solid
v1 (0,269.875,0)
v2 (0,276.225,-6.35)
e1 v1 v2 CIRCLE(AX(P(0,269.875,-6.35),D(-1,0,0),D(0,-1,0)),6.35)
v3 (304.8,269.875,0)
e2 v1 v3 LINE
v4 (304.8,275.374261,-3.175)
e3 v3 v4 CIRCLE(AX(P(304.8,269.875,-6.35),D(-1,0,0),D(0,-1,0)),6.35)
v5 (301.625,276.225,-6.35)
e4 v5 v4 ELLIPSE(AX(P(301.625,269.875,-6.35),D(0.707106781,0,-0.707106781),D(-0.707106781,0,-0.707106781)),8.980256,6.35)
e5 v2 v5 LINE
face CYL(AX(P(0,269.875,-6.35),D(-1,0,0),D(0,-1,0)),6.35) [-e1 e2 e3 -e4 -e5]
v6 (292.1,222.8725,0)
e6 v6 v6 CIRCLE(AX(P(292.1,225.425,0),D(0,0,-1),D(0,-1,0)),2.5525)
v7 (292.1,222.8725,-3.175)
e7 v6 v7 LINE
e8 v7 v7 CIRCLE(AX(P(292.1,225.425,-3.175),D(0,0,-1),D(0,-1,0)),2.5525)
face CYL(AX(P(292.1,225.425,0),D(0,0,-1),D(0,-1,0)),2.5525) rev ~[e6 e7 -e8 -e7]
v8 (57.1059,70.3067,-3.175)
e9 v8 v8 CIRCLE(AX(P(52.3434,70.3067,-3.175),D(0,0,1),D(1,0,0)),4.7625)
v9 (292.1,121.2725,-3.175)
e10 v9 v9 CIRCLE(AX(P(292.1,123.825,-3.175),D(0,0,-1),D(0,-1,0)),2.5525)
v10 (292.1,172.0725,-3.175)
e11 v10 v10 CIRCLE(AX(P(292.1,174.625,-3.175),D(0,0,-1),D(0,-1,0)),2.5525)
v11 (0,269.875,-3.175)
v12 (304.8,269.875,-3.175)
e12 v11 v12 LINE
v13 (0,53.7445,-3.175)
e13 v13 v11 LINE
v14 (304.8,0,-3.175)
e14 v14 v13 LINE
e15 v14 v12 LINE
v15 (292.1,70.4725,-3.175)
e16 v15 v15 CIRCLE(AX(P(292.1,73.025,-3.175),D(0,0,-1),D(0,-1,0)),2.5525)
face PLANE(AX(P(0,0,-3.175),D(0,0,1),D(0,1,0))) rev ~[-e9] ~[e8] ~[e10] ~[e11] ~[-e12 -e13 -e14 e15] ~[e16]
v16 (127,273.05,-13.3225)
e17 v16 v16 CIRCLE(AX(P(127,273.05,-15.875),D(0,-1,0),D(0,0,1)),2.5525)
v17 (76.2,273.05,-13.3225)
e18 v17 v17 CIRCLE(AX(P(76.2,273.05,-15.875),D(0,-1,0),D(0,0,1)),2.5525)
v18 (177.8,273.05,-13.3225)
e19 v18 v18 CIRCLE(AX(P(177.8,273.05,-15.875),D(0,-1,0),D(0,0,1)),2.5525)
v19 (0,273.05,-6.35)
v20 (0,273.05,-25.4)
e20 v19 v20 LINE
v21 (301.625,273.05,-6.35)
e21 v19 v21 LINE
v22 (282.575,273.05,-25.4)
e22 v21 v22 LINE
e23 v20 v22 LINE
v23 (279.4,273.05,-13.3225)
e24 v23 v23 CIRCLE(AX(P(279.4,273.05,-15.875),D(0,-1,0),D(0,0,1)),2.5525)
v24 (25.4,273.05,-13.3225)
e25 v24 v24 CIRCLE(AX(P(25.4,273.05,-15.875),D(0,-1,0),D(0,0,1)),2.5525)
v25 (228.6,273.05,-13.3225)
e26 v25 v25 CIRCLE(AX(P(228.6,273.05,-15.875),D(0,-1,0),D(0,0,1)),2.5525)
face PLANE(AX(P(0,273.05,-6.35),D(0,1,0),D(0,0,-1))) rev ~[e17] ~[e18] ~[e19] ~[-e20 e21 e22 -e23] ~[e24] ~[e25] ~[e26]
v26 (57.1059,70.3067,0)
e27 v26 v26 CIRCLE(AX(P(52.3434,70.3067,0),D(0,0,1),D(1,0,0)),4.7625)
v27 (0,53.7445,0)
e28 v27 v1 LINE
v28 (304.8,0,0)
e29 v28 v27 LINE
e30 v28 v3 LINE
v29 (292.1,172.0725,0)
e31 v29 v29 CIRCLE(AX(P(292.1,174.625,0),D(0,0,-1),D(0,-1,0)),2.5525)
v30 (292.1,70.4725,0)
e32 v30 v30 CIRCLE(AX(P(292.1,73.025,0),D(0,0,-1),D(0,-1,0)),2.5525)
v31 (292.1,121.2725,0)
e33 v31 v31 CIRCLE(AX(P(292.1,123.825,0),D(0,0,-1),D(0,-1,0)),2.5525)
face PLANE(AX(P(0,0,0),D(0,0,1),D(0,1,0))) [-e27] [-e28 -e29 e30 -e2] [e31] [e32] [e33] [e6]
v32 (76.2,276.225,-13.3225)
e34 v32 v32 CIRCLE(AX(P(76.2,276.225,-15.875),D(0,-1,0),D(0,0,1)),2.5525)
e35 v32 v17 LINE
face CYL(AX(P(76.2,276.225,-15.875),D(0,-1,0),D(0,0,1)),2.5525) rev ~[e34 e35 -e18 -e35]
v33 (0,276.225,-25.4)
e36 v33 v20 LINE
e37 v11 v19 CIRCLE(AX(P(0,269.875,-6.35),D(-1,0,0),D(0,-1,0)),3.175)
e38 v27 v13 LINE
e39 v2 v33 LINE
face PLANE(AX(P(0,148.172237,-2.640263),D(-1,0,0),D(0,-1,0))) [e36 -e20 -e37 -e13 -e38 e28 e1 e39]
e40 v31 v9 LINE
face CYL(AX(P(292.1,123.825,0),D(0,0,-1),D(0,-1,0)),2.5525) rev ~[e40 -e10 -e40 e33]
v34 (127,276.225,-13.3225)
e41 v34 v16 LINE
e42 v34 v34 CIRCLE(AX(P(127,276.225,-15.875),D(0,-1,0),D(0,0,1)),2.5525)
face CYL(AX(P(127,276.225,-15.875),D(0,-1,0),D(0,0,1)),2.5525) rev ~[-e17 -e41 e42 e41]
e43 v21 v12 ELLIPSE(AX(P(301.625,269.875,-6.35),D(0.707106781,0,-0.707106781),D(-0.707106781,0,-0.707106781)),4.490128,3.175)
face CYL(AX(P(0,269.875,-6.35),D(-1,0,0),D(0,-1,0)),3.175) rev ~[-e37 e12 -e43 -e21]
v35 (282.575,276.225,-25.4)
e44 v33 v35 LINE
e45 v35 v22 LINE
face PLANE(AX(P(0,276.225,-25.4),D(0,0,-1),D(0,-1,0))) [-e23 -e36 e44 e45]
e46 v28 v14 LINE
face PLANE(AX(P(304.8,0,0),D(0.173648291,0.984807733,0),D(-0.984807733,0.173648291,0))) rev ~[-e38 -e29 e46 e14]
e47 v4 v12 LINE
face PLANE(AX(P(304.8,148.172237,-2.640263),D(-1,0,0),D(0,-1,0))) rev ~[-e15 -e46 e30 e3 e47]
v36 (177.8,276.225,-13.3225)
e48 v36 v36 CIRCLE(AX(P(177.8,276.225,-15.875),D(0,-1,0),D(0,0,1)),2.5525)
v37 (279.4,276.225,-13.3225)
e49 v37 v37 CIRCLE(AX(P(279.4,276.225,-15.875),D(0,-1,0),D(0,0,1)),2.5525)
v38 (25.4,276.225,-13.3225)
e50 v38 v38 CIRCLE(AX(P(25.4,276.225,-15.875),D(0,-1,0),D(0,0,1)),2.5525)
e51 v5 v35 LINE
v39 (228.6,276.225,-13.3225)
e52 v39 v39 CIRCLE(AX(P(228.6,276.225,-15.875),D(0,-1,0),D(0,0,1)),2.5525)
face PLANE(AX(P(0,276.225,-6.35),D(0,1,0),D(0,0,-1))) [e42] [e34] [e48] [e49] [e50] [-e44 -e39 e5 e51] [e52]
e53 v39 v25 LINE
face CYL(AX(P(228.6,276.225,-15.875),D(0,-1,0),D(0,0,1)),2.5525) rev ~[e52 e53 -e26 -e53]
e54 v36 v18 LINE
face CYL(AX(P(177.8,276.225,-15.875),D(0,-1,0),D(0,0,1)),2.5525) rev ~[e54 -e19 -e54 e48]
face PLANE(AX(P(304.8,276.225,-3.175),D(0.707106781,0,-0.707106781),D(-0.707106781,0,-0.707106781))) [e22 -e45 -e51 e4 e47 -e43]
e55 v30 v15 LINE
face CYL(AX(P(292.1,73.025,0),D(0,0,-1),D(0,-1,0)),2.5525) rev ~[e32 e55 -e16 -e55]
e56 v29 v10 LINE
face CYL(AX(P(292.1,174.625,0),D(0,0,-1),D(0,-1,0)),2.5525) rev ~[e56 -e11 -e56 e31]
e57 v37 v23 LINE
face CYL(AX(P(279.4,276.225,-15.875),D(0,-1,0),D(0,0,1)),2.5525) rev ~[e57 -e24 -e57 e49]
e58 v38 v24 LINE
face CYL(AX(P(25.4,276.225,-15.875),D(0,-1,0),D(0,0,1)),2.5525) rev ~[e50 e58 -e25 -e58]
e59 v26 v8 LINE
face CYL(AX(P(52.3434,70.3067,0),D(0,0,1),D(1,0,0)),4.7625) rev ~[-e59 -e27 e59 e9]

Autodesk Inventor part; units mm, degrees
ref_plane "YZ Plane" through (0, 0, 0) normal (1, 0, 0) x (0, 1, 0)
ref_plane "XZ Plane" through (0, 0, 0) normal (0, 1, 0) x (-1, 0, 0)
ref_plane "XY Plane" through (0, 0, 0) normal (0, 0, 1) x (1, 0, 0)
sketch "Sketch1" plane through (0, 0, 0) normal (1, 0, 0) x (0, 1, 0)
  line L0 (0, 0) -> (276.225, 0)
  line L1 (276.225, 0) -> (276.225, -25.4)
  dimension "d0" = 25.4
  dimension "d1" = 276.225
contour flange "Contour Flange1" sketch "Sketch1" thickness 3.175 bend radius 3.175 width 304.8 along (1, 0, 0) mid plane no both sides no wall seen from (0, 138.1125, 0) lies toward (0, 0, -1) curves L0 L1
bend "Bend1"
corner "Corner1"
sketch "Sketch2" plane through (0, 0, 0) normal (0, 0, 1) x (1, 0, 0)
  line L0 (304.8, 0) -> (304.8, 269.875) projected
  line L1 (304.8, 0) -> (0, 53.7445)
  line L2 (0, 0) -> (0, 269.875) projected
  line L3 (0, 269.875) -> (304.8, 269.875) projected
  line L4 (0, 0) -> (0, 269.875) projected
  line L5 (304.8, 0) -> (0, 0) projected
  line L6 (304.8, 269.875) -> (304.8, 0) projected
  dimension "d13" = 10
extrude "Cut1" cut sketch "Sketch2" against normal blind 3.175 contours L5 L2 L1
sketch "Sketch3" plane through (0, 276.225, -25.4) normal (0, 1, 0) x (1, 0, 0)
  line L0 (304.8, -22.225) -> (282.575, 0)
  line L1 (0, 0) -> (304.8, 0) projected
  line L2 (304.8, 0) -> (304.8, -19.05) projected
  line L3 (304.8, 0) -> (304.8, -22.225)
  point P0 (0, -25.4)
  dimension "d16" = 45
extrude "Cut2" cut sketch "Sketch3" against normal through all
sketch "Sketch4" plane through (0, 269.875, 0) normal (0, 0, 1) x (1, 0, 0)
  line L0 (304.8, 0) -> (304.8, -269.875) projected
  point P0 (0, -269.875)
  point P1 (292.1, -196.85)
  point P2 (292.1, -146.05)
  point P3 (292.1, -95.25)
  point P4 (292.1, -44.45)
  dimension "d19" = 73.025
  dimension "d20" = 12.7
  dimension "d23" = 50.8
hole "Hole1" at (292.1, 73.025, 0) at (292.1, 123.825, 0) at (292.1, 174.625, 0) at (292.1, 225.425, 0) direction (0, 0, -1) diameter 5.105 end through all clearance for "Flat Head Machine Screw (82)" size "#10" standard "Ansi Unified Screw Threads"
sketch "Sketch5" plane through (0, 276.225, -6.35) normal (0, 1, 0) x (1, 0, 0)
  line L0 (0, 19.05) -> (282.575, 19.05) projected
  line L1 (0, 0) -> (0, 19.05) projected
  point P0 (0, -6.35)
  point P1 (25.4, 9.525)
  point P2 (76.2, 9.525)
  point P3 (127, 9.525)
  point P4 (177.8, 9.525)
  point P5 (228.6, 9.525)
  point P6 (279.4, 9.525)
  dimension "d35" = 9.525
  dimension "d36" = 25.4
  dimension "d39" = 50.8
hole "Hole2" at (25.4, 276.225, -15.875) at (76.2, 276.225, -15.875) at (127, 276.225, -15.875) at (177.8, 276.225, -15.875) at (228.6, 276.225, -15.875) at (279.4, 276.225, -15.875) direction (0, -1, 0) diameter 5.105 end through all clearance for "Flat Head Machine Screw (82)" size "#10" standard "Ansi Unified Screw Threads"
sketch "Sketch6" plane through (0, 269.875, 0) normal (0, 0, 1) x (1, 0, 0)
  circle A0 centre (52.3434, -199.5683) radius 4.7625
  line L0 (0, -216.1305) -> (304.8, -269.875) projected
  line L1 (0, -216.1305) -> (0, 0) projected
  point P0 (0, -269.875)
  dimension "d51" = 9.525
  dimension "d52" = 25.4
  dimension "d53" = 52.3434
extrude "Cut3" cut sketch "Sketch6" against normal blind 3.175
equation "\"d14\" = Thickness"
equation "\"d17\" = Thickness"
equation "\"d33\" = Thickness"
equation "\"d54\" = Thickness"
equation "\"d2\" = Thickness"
equation "\"d3\" = BendReliefWidth"
equation "\"d4\" = BendReliefDepth"
equation "\"d5\" = MinimumRemnant"
equation "\"d6\" = TransitionRadius"
equation "\"d8\" = BendRadius"
equation "\"d10\" = CornerReliefSize"
equation "\"d11\" = GapSize"
equation "\"d12\" = JacobiRadiusSize"
equation "\"BendRadius\" = Thickness"
equation "\"BendReliefWidth\" = Thickness"
equation "\"BendReliefDepth\" = 0.5 * Thickness"
equation "\"CornerReliefSize\" = 4 * Thickness"
equation "\"MinimumRemnant\" = 2 * Thickness"
equation "\"TransitionRadius\" = BendRadius"
equation "\"JacobiRadiusSize\" = BendRadius"
equation "\"GapSize\" = Thickness"
equation "\"Thickness\" = 3.175"
properties part number "SIDE_INTAKE_LEXAN" material "Polycarbonate, PC 1000, Clear"
